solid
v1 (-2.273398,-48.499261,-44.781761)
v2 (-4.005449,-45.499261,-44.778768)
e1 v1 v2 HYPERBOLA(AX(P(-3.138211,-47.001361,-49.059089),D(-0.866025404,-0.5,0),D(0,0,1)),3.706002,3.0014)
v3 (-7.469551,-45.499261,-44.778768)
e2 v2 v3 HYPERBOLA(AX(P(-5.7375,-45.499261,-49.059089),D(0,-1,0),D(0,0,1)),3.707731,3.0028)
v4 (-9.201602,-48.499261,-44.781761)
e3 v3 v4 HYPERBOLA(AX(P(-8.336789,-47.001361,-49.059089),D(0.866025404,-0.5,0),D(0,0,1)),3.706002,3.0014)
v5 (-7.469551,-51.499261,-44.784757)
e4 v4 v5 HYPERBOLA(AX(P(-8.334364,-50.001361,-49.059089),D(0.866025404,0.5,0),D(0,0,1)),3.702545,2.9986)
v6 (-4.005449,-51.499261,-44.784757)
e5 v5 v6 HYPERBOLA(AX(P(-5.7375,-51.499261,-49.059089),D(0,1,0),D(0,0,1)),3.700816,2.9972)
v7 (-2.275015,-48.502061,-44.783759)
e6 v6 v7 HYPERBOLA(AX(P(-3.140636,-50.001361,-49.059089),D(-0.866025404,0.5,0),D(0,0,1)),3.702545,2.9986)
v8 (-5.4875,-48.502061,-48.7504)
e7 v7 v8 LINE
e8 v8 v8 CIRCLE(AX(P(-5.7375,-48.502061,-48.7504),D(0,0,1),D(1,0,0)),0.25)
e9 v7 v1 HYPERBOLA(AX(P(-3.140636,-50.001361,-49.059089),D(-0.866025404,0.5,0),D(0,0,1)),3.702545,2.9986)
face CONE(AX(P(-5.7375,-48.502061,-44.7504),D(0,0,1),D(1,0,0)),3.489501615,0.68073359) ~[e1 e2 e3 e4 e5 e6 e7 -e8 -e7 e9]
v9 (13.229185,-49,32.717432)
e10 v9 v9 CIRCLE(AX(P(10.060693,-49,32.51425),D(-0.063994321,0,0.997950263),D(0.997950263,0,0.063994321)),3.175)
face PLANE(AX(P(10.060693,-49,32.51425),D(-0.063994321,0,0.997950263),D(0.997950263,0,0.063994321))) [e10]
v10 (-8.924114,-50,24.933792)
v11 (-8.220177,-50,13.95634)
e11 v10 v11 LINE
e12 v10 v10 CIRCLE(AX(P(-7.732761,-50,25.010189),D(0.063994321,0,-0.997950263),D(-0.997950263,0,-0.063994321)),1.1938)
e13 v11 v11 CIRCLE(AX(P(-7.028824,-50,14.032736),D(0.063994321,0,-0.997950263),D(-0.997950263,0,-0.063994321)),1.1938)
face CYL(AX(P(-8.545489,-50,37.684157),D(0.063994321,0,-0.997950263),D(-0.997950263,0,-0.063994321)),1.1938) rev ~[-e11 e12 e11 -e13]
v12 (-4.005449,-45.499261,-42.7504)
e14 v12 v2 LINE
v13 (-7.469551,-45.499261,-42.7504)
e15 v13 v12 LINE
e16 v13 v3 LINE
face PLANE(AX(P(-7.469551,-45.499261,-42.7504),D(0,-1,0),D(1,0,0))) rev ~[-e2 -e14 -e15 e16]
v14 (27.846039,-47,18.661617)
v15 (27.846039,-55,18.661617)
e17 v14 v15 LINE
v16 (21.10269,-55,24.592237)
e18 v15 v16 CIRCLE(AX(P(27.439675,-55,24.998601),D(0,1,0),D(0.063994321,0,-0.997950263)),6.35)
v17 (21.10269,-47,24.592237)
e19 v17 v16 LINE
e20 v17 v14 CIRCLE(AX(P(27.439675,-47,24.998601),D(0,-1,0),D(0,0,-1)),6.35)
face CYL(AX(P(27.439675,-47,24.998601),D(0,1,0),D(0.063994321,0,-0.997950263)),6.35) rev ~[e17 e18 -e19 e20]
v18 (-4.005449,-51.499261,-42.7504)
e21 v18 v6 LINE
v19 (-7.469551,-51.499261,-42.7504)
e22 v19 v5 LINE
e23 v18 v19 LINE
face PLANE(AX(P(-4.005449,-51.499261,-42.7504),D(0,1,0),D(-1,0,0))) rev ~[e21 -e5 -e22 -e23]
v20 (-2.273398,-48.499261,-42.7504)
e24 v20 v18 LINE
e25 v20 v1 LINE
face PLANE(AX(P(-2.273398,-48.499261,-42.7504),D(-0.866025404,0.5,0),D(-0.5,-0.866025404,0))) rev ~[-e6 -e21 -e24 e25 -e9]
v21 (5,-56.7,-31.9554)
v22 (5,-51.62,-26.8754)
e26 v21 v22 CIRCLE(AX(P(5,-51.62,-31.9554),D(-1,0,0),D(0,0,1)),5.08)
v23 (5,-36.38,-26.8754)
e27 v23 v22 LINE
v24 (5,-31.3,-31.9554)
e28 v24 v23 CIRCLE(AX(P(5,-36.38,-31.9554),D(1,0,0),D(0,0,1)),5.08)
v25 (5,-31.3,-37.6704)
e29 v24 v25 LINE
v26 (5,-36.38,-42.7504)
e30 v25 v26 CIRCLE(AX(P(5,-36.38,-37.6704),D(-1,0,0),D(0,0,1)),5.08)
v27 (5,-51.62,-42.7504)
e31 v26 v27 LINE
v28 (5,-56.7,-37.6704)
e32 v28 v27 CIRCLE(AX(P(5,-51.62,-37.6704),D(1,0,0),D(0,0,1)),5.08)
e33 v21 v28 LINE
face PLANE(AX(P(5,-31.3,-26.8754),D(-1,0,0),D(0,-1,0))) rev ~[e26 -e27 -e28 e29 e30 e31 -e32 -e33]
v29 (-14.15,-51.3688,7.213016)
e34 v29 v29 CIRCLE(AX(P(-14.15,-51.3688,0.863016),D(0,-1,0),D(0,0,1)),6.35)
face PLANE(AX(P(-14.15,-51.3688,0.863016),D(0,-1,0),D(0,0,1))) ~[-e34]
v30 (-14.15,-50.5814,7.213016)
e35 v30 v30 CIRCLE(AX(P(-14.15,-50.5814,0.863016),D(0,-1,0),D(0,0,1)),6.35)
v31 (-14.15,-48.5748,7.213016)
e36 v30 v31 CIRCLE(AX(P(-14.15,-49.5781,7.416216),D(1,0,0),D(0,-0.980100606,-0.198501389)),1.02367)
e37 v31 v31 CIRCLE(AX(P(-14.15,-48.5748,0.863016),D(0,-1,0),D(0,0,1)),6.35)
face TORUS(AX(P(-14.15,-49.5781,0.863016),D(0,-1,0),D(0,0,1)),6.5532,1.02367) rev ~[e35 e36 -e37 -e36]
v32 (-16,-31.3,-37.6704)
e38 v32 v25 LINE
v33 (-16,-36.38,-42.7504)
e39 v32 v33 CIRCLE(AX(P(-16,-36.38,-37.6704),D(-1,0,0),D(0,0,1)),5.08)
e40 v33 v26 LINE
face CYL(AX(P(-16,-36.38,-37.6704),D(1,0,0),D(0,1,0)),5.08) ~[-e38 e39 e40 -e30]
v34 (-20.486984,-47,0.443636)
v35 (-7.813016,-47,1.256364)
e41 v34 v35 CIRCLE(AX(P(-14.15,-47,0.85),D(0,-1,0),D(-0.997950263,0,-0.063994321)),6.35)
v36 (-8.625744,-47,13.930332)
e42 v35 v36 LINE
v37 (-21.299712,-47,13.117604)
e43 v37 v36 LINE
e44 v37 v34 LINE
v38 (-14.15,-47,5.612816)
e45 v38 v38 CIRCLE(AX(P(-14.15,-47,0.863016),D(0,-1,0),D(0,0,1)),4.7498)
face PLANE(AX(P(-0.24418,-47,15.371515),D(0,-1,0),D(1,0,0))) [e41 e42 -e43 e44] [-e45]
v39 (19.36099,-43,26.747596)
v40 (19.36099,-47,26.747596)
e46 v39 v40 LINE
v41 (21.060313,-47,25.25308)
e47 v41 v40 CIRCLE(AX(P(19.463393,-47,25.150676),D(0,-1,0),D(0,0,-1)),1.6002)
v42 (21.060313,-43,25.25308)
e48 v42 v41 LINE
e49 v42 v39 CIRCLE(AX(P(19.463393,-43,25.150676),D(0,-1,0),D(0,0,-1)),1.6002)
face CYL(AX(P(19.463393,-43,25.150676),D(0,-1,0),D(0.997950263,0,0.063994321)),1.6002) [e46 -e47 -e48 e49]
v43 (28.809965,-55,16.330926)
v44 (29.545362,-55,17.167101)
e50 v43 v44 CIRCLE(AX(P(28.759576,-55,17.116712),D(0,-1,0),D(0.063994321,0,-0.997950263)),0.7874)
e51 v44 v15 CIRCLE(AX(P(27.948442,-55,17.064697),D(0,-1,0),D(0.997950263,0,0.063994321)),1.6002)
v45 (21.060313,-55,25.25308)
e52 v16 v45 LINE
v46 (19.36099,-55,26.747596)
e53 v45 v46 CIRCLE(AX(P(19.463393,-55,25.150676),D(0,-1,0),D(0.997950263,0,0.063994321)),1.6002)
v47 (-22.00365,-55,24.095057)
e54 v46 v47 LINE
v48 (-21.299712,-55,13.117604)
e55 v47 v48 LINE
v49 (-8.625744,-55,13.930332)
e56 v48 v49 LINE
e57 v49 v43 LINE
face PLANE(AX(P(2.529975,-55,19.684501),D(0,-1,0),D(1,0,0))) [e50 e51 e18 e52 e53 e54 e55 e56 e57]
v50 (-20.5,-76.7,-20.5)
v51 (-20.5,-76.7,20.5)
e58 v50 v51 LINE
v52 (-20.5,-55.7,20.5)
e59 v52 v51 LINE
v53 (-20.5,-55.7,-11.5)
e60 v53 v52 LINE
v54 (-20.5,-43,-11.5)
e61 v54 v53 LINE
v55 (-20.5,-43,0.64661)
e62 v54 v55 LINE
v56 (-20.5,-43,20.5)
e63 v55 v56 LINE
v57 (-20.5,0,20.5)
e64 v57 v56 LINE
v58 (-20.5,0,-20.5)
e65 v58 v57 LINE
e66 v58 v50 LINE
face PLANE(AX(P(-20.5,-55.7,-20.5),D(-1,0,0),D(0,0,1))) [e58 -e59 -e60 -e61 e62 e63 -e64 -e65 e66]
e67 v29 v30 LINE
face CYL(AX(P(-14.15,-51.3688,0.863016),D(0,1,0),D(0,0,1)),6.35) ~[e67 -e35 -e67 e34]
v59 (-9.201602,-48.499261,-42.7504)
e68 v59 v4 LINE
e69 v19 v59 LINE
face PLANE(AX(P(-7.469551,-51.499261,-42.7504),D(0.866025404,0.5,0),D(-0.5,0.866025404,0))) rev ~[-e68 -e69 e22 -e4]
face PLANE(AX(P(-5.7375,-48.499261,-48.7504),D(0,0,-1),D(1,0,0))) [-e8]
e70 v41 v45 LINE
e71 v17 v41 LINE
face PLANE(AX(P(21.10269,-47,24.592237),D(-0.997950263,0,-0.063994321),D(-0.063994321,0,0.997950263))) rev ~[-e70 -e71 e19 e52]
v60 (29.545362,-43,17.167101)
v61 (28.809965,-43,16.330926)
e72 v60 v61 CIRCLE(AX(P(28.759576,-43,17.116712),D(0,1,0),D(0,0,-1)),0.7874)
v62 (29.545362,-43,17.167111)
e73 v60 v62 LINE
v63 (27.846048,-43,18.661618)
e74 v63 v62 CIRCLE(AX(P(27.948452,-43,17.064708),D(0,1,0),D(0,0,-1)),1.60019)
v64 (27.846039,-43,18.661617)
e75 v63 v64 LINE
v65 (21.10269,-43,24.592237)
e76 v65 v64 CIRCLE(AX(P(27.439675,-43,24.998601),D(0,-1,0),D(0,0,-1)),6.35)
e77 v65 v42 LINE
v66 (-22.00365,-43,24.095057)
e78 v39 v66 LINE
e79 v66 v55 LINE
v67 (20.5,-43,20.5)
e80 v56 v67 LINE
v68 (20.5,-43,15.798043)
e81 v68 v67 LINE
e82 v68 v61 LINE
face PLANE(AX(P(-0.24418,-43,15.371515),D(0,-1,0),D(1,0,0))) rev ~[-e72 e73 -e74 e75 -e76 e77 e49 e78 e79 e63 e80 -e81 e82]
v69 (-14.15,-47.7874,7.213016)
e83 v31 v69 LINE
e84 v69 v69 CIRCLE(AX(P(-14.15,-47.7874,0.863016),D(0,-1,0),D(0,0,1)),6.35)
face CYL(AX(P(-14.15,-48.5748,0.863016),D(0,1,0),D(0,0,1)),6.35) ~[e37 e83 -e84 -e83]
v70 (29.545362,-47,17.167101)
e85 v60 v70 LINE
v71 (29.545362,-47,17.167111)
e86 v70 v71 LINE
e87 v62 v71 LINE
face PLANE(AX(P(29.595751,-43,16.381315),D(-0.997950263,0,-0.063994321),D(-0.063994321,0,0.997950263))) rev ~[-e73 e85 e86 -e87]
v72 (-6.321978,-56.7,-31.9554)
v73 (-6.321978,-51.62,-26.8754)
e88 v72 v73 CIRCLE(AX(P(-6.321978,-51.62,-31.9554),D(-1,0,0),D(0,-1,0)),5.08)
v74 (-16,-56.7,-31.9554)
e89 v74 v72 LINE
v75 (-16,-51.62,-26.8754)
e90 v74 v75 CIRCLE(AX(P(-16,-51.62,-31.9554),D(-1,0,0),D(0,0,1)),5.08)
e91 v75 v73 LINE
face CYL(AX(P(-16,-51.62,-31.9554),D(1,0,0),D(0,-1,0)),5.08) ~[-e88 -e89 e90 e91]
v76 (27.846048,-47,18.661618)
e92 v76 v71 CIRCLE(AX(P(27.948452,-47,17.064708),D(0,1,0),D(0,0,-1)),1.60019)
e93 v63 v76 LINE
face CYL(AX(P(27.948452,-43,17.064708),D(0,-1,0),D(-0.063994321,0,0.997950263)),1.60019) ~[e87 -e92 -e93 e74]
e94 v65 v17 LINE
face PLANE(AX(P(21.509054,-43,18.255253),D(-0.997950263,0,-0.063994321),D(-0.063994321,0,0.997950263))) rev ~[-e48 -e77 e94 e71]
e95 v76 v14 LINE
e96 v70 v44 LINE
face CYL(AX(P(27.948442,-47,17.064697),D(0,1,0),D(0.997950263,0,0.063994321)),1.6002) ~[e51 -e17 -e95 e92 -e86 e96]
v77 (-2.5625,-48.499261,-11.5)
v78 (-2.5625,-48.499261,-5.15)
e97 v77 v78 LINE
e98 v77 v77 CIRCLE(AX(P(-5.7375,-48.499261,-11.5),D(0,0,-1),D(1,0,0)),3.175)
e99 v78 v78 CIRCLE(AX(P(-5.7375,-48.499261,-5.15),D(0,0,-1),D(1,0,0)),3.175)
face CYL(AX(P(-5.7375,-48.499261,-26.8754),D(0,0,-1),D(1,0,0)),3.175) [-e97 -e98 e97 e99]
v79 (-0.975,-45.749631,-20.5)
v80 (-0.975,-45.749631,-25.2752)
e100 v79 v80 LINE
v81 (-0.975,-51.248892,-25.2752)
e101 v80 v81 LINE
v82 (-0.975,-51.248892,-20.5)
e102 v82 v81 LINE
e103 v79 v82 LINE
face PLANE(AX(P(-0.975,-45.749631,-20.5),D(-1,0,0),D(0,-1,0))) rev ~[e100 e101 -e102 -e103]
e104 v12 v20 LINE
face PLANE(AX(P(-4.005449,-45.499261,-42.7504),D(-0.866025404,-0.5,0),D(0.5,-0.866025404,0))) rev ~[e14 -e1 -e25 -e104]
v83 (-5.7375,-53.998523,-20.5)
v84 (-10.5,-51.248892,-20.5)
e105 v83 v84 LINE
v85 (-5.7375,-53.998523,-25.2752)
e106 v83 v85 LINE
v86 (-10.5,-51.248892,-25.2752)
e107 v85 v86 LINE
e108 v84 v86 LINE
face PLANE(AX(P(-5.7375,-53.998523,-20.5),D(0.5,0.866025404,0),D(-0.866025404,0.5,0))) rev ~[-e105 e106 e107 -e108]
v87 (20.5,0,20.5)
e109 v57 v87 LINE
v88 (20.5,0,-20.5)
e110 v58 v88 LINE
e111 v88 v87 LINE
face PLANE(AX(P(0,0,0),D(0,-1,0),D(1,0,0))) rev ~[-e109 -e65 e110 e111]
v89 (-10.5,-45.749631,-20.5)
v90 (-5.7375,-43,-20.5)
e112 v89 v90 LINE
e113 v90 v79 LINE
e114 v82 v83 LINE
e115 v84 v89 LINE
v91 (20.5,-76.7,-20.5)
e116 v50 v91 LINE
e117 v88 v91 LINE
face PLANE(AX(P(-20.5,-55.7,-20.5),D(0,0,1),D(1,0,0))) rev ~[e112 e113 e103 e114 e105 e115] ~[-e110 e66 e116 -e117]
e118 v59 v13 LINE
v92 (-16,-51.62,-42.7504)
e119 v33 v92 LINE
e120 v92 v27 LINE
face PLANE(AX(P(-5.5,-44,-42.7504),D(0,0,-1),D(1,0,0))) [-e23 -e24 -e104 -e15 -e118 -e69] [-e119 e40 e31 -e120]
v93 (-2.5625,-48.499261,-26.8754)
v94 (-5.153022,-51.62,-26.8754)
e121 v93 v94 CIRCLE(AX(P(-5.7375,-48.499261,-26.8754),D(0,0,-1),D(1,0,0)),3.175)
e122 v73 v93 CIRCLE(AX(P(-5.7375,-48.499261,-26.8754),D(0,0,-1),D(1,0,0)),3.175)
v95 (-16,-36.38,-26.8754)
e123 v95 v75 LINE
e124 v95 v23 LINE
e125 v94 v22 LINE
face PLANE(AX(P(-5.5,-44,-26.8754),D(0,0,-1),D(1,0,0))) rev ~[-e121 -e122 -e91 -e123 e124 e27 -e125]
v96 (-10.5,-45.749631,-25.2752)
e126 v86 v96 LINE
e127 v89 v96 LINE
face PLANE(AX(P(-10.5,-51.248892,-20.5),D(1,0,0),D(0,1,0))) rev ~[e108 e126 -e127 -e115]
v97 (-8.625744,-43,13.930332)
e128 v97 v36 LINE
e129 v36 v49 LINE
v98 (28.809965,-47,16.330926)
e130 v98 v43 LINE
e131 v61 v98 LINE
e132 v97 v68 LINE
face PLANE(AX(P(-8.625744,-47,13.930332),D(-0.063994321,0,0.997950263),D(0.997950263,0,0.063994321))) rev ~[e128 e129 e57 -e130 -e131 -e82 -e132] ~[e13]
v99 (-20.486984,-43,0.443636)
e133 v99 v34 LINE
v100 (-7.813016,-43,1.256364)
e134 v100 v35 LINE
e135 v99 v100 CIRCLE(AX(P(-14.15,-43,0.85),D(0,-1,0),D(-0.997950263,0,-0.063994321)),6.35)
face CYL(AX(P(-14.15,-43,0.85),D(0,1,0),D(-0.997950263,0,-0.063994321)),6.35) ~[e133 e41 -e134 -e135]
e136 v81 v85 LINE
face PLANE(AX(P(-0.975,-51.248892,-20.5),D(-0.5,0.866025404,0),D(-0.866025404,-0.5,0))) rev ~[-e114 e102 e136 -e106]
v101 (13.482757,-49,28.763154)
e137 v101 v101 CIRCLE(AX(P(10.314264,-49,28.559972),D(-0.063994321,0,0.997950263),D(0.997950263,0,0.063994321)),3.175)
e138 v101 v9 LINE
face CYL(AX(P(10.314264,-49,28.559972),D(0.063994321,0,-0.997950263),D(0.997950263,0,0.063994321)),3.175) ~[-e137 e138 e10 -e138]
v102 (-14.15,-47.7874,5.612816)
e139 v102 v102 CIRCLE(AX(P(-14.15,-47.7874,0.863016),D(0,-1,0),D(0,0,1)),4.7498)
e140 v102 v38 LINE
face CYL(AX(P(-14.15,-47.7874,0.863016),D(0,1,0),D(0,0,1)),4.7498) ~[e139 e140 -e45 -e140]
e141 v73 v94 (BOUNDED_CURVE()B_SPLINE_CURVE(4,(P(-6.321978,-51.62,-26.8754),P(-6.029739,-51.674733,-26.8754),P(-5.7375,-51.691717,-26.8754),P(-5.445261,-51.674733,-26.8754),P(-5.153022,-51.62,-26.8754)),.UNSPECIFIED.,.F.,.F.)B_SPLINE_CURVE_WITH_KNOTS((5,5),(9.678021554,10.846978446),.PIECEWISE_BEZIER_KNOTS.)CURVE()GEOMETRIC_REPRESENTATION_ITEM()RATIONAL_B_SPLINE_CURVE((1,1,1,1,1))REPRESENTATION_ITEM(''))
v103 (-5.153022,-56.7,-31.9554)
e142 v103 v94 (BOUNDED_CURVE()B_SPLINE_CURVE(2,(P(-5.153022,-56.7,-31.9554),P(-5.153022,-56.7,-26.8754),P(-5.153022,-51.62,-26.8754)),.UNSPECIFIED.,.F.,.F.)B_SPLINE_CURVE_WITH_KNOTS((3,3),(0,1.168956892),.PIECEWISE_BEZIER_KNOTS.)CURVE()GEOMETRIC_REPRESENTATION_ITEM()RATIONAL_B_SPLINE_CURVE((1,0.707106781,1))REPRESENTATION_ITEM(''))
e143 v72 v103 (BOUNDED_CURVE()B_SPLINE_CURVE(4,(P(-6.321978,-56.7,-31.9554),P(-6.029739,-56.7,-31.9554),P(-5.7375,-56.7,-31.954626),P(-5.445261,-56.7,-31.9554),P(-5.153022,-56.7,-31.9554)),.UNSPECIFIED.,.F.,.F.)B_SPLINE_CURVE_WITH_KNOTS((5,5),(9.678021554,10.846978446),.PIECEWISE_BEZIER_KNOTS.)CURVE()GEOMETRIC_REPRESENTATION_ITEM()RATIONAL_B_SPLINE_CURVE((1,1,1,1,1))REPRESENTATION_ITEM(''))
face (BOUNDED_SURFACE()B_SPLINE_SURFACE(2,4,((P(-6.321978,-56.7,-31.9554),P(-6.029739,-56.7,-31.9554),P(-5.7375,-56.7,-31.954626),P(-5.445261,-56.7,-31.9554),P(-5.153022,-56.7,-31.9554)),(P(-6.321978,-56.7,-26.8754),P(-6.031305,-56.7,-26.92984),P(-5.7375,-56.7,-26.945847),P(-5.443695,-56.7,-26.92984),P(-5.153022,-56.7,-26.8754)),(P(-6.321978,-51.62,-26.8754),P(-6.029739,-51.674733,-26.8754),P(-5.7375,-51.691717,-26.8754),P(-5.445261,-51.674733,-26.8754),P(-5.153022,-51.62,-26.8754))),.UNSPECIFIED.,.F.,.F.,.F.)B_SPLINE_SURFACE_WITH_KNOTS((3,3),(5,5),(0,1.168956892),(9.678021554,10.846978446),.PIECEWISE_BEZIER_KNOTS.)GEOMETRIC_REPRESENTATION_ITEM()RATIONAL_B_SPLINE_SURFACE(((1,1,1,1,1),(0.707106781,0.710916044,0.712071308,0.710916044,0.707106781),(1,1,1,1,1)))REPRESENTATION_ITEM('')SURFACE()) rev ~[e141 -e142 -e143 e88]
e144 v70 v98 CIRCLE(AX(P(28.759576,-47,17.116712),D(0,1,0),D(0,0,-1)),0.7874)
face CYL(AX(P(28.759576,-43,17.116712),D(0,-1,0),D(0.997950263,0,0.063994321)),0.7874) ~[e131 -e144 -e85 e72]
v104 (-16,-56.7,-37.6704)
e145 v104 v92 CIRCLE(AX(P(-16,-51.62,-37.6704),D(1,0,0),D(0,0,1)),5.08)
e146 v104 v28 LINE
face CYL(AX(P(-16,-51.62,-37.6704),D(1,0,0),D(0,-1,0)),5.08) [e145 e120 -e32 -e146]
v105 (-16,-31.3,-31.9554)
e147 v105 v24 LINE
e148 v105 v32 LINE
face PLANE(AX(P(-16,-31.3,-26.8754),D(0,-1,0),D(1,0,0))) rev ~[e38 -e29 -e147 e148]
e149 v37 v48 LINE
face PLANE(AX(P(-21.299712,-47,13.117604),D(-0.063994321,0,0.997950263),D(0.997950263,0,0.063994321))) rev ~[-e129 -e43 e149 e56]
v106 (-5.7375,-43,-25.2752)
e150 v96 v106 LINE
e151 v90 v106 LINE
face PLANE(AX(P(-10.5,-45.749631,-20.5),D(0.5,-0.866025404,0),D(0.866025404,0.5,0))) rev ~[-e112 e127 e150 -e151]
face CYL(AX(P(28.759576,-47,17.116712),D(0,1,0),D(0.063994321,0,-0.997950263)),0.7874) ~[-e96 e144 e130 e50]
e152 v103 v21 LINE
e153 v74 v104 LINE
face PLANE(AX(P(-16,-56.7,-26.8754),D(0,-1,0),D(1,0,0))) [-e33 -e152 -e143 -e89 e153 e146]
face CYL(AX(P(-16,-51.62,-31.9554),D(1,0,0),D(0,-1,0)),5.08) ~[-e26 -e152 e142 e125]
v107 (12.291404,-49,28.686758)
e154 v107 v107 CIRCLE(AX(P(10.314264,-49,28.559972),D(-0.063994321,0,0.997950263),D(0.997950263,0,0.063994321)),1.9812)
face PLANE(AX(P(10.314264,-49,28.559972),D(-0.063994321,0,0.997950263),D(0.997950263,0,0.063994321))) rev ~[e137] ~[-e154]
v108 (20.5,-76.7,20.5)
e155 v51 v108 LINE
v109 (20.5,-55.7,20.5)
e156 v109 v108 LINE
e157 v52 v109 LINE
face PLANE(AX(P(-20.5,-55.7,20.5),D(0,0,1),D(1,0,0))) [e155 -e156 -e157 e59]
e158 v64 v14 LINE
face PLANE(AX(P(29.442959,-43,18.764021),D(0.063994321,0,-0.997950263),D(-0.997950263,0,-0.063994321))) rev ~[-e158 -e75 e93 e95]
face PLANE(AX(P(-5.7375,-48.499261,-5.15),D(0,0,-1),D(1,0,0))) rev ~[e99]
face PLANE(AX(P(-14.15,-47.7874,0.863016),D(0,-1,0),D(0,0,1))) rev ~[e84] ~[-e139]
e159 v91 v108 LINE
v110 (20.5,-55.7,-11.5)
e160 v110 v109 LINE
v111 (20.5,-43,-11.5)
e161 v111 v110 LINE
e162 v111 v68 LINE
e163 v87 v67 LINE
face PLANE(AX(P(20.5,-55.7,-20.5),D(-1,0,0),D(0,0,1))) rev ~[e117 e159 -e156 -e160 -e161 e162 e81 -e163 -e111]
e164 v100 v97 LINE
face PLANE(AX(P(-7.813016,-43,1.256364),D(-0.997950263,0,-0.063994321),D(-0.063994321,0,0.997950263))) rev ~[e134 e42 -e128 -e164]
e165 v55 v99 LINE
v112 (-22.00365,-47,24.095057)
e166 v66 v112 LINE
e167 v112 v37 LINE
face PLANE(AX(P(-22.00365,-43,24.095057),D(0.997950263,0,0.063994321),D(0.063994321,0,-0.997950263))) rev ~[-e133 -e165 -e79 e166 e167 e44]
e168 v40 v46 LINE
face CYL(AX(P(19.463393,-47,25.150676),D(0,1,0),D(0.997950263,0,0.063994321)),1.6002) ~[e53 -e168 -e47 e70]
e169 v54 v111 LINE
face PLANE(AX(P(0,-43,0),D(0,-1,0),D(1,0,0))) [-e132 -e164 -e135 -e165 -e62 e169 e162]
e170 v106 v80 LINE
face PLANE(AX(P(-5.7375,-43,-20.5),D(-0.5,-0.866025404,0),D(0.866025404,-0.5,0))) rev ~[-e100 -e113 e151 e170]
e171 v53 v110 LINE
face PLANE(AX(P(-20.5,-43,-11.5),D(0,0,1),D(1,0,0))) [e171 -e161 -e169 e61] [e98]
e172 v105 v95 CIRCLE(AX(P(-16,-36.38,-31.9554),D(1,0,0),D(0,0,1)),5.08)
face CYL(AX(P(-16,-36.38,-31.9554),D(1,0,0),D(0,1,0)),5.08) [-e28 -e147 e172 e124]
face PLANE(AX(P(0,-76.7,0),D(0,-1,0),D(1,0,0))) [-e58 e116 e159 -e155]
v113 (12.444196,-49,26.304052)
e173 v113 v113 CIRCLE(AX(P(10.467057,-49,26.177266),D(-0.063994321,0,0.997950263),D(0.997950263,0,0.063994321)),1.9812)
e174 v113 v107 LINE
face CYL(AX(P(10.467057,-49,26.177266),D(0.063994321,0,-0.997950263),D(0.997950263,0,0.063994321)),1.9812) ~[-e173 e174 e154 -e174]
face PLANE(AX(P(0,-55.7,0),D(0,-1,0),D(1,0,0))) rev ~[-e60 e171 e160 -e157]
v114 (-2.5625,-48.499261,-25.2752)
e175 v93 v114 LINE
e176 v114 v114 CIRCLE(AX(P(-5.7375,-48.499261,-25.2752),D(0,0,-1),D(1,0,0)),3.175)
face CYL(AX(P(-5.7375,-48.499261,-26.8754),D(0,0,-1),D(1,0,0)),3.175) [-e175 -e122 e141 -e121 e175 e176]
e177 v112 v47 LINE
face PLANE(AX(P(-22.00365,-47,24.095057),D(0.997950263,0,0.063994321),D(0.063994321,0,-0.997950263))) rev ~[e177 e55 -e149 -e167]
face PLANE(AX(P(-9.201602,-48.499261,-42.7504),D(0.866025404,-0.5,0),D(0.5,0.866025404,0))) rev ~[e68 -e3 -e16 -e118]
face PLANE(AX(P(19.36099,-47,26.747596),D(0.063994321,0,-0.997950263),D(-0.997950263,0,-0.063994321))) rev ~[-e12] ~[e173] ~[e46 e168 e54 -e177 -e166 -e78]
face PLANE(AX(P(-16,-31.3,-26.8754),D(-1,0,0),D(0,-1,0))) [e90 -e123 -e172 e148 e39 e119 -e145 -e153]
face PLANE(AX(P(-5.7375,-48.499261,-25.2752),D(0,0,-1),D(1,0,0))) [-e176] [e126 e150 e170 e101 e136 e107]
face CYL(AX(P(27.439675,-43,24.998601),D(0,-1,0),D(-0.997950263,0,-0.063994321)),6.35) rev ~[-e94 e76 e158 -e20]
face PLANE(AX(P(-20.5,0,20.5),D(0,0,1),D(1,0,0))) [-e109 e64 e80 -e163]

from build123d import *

# Parameters (mm, degrees)
F0_W      = 41
F0_H      = 41
F1_DEPTH  = 43
F2_W      = 41
F2_H      = 9
F3_DEPTH  = 12.7
F5_DEPTH  = 4
F6_R      = 6.35
F7_R      = 1.60019
F8_R      = 1.6002
F9_R      = 0.7874
F11_DEPTH = 8
F12_W     = 41
F12_H     = 41
F13_DEPTH = 21
F15_D     = 2.3876
F15_DEPTH = 12.7
F15_TIP   = 0.717307407
F16_R     = 1.9812
F17_DEPTH = 2.3876
F18_R     = 3.175
F19_DEPTH = 3.9624
F21_DEPTH = 4.7752
F23_R     = 3.175
F24_DEPTH = 21.7254
F28_W     = 21
F28_H     = 25.4
F29_DEPTH = 15.875
F30_R     = 5.08
F32_DEPTH = 6


# Not quite as in the source:
# - a fillet or chamfer is up to 0.001 mm smaller than in the source, because OpenCascade refuses the exact size


with BuildPart() as f1:
    # F0 (on Front) → F1 (new body)
    with BuildSketch(Plane.XZ):
        Rectangle(F0_W, F0_H)
    extrude(amount=F1_DEPTH)

    # F2 (on face) → F3 (join)
    with BuildSketch(Plane.XZ.offset(43)):
        with Locations((0, -16)):
            Rectangle(F2_W, F2_H)
    extrude(amount=F3_DEPTH)

    # F4 (on face) → F5 (join)
    with BuildSketch(Plane.XZ.offset(43)):
        with BuildLine():
            Line((-22.0036495704, 24.0950572902), (-20.4869841684, 0.4436360632))
            ThreePointArc((-20.4869841684, 0.4436360632), (-13.7436360632, -5.4869841684), (-7.8130158316, 1.2563639368))
            Line((-7.8130158316, 1.2563639368), (-8.6257437052, 13.9303322737))
            Line((-8.6257437052, 13.9303322737), (29.5957513579, 16.3813147587))
            Line((29.5957513579, 16.3813147587), (29.4429585176, 18.764020806))
            Line((29.4429585176, 18.764020806), (21.5090543388, 18.2552531571))
            Line((21.5090543388, 18.2552531571), (20.9579096507, 26.85))
            Line((20.9579096507, 26.85), (-22.0036495704, 24.0950572902))
        make_face()
    extrude(amount=F5_DEPTH)

    # F6
    f6_edges = [f1.edges().sort_by_distance(p)[0] for p in [
        (21.509054, -45, 18.255253),
    ]]
    fillet(f6_edges, radius=F6_R)

    # F7 (radius 1.6002 in the source; OpenCascade refuses exactly that, so slightly less here)
    f7_edges = [f1.edges().sort_by_distance(p)[0] for p in [
        (29.442959, -45, 18.764021),
    ]]
    fillet(f7_edges, radius=F7_R)

    # F8
    f8_edges = [f1.edges().sort_by_distance(p)[0] for p in [
        (20.95791, -45, 26.85),
    ]]
    fillet(f8_edges, radius=F8_R)

    # F9
    f9_edges = [f1.edges().sort_by_distance(p)[0] for p in [
        (29.595751, -45, 16.381315),
    ]]
    fillet(f9_edges, radius=F9_R)

    # F10 (on face) → F11 (join)
    with BuildSketch(Plane.XZ.offset(47)):
        with BuildLine():
            Line((19.3609896402, 26.7475962879), (-22.0036495704, 24.0950572902))
            Line((-22.0036495704, 24.0950572902), (-21.2997120421, 13.1176044))
            Line((-21.2997120421, 13.1176044), (-8.6257437052, 13.9303322737))
            Line((-8.6257437052, 13.9303322737), (28.809965321, 16.3309256305))
            ThreePointArc((28.809965321, 16.3309256305), (29.3508413223, 16.5967075264), (29.5453622297, 17.1671007956))
            ThreePointArc((29.5453622297, 17.1671007956), (29.0052248284, 18.2663004111), (27.8460385072, 18.661617094))
            ThreePointArc((27.8460385072, 18.661617094), (23.246092788, 20.2303340893), (21.102690402, 24.5922373256))
            Line((21.102690402, 24.5922373256), (21.0603133628, 25.2530799896))
            ThreePointArc((21.0603133628, 25.2530799896), (20.5201759615, 26.3522796051), (19.3609896402, 26.7475962879))
        make_face()
    extrude(amount=F11_DEPTH)

    # F12 (on face) → F13 (join)
    with BuildSketch(Plane.XZ.offset(55.7)):
        Rectangle(F12_W, F12_H)
    extrude(amount=F13_DEPTH)

    # F15
    with Locations(Plane(origin=(-1.628897193, 0, 25.4016038063), x_dir=(0.9979502627, 0, 0.0639943208), z_dir=(-0.0639943208, 0, 0.9979502627))):
        with Locations((-6.1164010452, -50)):
            Hole(F15_D / 2, depth=F15_DEPTH)
            with Locations((0, 0, -(F15_DEPTH + F15_TIP / 2))):  # 118° drill point
                Cone(0, F15_D / 2, F15_TIP, mode=Mode.SUBTRACT)

    # F16 (on face) → F17 (join)
    with BuildSketch(Plane(origin=(-1.628897193, 0, 25.4016038063), x_dir=(0.9979502627, 0, 0.0639943208), z_dir=(-0.0639943208, 0, 0.9979502627))):
        with Locations((12.1207989548, -49)):
            Circle(F16_R)
    extrude(amount=F17_DEPTH)

    # F18 (on face) → F19 (join)
    with BuildSketch(Plane(origin=(-1.7816900333, 0, 27.7843098536), x_dir=(0.9979502627, 0, 0.0639943208), z_dir=(-0.0639943208, 0, 0.9979502627))):
        with Locations((12.1207989548, -49)):
            Circle(F18_R)
    extrude(amount=F19_DEPTH)

    # F20 (on face) → F21 (join)
    with BuildSketch(Plane(origin=(0, 0, -20.5), x_dir=(1, 0, 0), z_dir=(0, 0, -1))):
        Polygon((-5.7375, 43), (-0.975, 45.749630657), (-0.975, 51.248891971), (-5.7375, 53.9985226281), (-10.5, 51.248891971), (-10.5, 45.749630657), align=None)
    extrude(amount=F21_DEPTH)

    # F23 (on offset) → F24 (join, through all)
    with BuildSketch(Plane(origin=(0, 0, -26.8754), x_dir=(1, 0, 0), z_dir=(0, 0, -1))):
        with Locations((-5.7375, 48.499261314)):
            Circle(F23_R)
    extrude(amount=-F24_DEPTH)

    # F26 (on face) → F27 (revolve)
    with BuildSketch(Plane(origin=(-14.15, 0, 0), x_dir=(0, -1, 0), z_dir=(-1, 0, 0))):
        with BuildLine():
            Line((47.7874, 5.6128158316), (47, 5.6128158316))
            Line((47, 5.6128158316), (47, 0.8630158316))
            Line((47, 0.8630158316), (51.3688, 0.8630158316))
            Line((51.3688, 0.8630158316), (51.3688, 7.2130158316))
            Line((51.3688, 7.2130158316), (50.5814, 7.2130158316))
            ThreePointArc((50.5814, 7.2130158316), (49.5781, 6.392545411), (48.5748, 7.2130158316))
            Line((48.5748, 7.2130158316), (47.7874, 7.2130158316))
            Line((47.7874, 7.2130158316), (47.7874, 5.6128158316))
        make_face()
    revolve(axis=Axis((-14.15, -49.1844, 0.8630158316), (0, -1, 0)))

    # F28 (on face) → F29 (join)
    with BuildSketch(Plane(origin=(0, 0, -26.8754), x_dir=(1, 0, 0), z_dir=(0, 0, -1))):
        with Locations((-5.5, 44)):
            Rectangle(F28_W, F28_H)
    extrude(amount=F29_DEPTH)

    # F30
    f30_edges = [f1.edges().sort_by_distance(p)[0] for p in [
        (-5.5, -56.7, -42.7504),
        (-5.5, -56.7, -26.8754),
        (-5.5, -31.3, -42.7504),
        (-5.5, -31.3, -26.8754),
    ]]
    fillet(f30_edges, radius=F30_R)

    # F31 (on face) → F32 (join)
    with BuildSketch(Plane(origin=(0, 0, -42.7504), x_dir=(1, 0, 0), z_dir=(0, 0, -1))):
        Polygon((-4.0054491924, 45.499261314), (-2.2733983849, 48.499261314), (-4.0054491924, 51.499261314), (-7.4695508076, 51.499261314), (-9.2016016151, 48.499261314), (-7.4695508076, 45.499261314), align=None)
    extrude(amount=F32_DEPTH)

    # F34 (on offset) → F35 (revolve, cut)
    with BuildSketch(Plane.XZ.offset(48.502061314)):
        Polygon((-2.2479983849, -44.7504), (-5.4875, -48.7504), (-2.2479983849, -48.7504), align=None)
    revolve(axis=Axis((-5.7375, -48.502061314, -47.4463791664), (0, 0, 1)), mode=Mode.SUBTRACT)


solid = f1.part
